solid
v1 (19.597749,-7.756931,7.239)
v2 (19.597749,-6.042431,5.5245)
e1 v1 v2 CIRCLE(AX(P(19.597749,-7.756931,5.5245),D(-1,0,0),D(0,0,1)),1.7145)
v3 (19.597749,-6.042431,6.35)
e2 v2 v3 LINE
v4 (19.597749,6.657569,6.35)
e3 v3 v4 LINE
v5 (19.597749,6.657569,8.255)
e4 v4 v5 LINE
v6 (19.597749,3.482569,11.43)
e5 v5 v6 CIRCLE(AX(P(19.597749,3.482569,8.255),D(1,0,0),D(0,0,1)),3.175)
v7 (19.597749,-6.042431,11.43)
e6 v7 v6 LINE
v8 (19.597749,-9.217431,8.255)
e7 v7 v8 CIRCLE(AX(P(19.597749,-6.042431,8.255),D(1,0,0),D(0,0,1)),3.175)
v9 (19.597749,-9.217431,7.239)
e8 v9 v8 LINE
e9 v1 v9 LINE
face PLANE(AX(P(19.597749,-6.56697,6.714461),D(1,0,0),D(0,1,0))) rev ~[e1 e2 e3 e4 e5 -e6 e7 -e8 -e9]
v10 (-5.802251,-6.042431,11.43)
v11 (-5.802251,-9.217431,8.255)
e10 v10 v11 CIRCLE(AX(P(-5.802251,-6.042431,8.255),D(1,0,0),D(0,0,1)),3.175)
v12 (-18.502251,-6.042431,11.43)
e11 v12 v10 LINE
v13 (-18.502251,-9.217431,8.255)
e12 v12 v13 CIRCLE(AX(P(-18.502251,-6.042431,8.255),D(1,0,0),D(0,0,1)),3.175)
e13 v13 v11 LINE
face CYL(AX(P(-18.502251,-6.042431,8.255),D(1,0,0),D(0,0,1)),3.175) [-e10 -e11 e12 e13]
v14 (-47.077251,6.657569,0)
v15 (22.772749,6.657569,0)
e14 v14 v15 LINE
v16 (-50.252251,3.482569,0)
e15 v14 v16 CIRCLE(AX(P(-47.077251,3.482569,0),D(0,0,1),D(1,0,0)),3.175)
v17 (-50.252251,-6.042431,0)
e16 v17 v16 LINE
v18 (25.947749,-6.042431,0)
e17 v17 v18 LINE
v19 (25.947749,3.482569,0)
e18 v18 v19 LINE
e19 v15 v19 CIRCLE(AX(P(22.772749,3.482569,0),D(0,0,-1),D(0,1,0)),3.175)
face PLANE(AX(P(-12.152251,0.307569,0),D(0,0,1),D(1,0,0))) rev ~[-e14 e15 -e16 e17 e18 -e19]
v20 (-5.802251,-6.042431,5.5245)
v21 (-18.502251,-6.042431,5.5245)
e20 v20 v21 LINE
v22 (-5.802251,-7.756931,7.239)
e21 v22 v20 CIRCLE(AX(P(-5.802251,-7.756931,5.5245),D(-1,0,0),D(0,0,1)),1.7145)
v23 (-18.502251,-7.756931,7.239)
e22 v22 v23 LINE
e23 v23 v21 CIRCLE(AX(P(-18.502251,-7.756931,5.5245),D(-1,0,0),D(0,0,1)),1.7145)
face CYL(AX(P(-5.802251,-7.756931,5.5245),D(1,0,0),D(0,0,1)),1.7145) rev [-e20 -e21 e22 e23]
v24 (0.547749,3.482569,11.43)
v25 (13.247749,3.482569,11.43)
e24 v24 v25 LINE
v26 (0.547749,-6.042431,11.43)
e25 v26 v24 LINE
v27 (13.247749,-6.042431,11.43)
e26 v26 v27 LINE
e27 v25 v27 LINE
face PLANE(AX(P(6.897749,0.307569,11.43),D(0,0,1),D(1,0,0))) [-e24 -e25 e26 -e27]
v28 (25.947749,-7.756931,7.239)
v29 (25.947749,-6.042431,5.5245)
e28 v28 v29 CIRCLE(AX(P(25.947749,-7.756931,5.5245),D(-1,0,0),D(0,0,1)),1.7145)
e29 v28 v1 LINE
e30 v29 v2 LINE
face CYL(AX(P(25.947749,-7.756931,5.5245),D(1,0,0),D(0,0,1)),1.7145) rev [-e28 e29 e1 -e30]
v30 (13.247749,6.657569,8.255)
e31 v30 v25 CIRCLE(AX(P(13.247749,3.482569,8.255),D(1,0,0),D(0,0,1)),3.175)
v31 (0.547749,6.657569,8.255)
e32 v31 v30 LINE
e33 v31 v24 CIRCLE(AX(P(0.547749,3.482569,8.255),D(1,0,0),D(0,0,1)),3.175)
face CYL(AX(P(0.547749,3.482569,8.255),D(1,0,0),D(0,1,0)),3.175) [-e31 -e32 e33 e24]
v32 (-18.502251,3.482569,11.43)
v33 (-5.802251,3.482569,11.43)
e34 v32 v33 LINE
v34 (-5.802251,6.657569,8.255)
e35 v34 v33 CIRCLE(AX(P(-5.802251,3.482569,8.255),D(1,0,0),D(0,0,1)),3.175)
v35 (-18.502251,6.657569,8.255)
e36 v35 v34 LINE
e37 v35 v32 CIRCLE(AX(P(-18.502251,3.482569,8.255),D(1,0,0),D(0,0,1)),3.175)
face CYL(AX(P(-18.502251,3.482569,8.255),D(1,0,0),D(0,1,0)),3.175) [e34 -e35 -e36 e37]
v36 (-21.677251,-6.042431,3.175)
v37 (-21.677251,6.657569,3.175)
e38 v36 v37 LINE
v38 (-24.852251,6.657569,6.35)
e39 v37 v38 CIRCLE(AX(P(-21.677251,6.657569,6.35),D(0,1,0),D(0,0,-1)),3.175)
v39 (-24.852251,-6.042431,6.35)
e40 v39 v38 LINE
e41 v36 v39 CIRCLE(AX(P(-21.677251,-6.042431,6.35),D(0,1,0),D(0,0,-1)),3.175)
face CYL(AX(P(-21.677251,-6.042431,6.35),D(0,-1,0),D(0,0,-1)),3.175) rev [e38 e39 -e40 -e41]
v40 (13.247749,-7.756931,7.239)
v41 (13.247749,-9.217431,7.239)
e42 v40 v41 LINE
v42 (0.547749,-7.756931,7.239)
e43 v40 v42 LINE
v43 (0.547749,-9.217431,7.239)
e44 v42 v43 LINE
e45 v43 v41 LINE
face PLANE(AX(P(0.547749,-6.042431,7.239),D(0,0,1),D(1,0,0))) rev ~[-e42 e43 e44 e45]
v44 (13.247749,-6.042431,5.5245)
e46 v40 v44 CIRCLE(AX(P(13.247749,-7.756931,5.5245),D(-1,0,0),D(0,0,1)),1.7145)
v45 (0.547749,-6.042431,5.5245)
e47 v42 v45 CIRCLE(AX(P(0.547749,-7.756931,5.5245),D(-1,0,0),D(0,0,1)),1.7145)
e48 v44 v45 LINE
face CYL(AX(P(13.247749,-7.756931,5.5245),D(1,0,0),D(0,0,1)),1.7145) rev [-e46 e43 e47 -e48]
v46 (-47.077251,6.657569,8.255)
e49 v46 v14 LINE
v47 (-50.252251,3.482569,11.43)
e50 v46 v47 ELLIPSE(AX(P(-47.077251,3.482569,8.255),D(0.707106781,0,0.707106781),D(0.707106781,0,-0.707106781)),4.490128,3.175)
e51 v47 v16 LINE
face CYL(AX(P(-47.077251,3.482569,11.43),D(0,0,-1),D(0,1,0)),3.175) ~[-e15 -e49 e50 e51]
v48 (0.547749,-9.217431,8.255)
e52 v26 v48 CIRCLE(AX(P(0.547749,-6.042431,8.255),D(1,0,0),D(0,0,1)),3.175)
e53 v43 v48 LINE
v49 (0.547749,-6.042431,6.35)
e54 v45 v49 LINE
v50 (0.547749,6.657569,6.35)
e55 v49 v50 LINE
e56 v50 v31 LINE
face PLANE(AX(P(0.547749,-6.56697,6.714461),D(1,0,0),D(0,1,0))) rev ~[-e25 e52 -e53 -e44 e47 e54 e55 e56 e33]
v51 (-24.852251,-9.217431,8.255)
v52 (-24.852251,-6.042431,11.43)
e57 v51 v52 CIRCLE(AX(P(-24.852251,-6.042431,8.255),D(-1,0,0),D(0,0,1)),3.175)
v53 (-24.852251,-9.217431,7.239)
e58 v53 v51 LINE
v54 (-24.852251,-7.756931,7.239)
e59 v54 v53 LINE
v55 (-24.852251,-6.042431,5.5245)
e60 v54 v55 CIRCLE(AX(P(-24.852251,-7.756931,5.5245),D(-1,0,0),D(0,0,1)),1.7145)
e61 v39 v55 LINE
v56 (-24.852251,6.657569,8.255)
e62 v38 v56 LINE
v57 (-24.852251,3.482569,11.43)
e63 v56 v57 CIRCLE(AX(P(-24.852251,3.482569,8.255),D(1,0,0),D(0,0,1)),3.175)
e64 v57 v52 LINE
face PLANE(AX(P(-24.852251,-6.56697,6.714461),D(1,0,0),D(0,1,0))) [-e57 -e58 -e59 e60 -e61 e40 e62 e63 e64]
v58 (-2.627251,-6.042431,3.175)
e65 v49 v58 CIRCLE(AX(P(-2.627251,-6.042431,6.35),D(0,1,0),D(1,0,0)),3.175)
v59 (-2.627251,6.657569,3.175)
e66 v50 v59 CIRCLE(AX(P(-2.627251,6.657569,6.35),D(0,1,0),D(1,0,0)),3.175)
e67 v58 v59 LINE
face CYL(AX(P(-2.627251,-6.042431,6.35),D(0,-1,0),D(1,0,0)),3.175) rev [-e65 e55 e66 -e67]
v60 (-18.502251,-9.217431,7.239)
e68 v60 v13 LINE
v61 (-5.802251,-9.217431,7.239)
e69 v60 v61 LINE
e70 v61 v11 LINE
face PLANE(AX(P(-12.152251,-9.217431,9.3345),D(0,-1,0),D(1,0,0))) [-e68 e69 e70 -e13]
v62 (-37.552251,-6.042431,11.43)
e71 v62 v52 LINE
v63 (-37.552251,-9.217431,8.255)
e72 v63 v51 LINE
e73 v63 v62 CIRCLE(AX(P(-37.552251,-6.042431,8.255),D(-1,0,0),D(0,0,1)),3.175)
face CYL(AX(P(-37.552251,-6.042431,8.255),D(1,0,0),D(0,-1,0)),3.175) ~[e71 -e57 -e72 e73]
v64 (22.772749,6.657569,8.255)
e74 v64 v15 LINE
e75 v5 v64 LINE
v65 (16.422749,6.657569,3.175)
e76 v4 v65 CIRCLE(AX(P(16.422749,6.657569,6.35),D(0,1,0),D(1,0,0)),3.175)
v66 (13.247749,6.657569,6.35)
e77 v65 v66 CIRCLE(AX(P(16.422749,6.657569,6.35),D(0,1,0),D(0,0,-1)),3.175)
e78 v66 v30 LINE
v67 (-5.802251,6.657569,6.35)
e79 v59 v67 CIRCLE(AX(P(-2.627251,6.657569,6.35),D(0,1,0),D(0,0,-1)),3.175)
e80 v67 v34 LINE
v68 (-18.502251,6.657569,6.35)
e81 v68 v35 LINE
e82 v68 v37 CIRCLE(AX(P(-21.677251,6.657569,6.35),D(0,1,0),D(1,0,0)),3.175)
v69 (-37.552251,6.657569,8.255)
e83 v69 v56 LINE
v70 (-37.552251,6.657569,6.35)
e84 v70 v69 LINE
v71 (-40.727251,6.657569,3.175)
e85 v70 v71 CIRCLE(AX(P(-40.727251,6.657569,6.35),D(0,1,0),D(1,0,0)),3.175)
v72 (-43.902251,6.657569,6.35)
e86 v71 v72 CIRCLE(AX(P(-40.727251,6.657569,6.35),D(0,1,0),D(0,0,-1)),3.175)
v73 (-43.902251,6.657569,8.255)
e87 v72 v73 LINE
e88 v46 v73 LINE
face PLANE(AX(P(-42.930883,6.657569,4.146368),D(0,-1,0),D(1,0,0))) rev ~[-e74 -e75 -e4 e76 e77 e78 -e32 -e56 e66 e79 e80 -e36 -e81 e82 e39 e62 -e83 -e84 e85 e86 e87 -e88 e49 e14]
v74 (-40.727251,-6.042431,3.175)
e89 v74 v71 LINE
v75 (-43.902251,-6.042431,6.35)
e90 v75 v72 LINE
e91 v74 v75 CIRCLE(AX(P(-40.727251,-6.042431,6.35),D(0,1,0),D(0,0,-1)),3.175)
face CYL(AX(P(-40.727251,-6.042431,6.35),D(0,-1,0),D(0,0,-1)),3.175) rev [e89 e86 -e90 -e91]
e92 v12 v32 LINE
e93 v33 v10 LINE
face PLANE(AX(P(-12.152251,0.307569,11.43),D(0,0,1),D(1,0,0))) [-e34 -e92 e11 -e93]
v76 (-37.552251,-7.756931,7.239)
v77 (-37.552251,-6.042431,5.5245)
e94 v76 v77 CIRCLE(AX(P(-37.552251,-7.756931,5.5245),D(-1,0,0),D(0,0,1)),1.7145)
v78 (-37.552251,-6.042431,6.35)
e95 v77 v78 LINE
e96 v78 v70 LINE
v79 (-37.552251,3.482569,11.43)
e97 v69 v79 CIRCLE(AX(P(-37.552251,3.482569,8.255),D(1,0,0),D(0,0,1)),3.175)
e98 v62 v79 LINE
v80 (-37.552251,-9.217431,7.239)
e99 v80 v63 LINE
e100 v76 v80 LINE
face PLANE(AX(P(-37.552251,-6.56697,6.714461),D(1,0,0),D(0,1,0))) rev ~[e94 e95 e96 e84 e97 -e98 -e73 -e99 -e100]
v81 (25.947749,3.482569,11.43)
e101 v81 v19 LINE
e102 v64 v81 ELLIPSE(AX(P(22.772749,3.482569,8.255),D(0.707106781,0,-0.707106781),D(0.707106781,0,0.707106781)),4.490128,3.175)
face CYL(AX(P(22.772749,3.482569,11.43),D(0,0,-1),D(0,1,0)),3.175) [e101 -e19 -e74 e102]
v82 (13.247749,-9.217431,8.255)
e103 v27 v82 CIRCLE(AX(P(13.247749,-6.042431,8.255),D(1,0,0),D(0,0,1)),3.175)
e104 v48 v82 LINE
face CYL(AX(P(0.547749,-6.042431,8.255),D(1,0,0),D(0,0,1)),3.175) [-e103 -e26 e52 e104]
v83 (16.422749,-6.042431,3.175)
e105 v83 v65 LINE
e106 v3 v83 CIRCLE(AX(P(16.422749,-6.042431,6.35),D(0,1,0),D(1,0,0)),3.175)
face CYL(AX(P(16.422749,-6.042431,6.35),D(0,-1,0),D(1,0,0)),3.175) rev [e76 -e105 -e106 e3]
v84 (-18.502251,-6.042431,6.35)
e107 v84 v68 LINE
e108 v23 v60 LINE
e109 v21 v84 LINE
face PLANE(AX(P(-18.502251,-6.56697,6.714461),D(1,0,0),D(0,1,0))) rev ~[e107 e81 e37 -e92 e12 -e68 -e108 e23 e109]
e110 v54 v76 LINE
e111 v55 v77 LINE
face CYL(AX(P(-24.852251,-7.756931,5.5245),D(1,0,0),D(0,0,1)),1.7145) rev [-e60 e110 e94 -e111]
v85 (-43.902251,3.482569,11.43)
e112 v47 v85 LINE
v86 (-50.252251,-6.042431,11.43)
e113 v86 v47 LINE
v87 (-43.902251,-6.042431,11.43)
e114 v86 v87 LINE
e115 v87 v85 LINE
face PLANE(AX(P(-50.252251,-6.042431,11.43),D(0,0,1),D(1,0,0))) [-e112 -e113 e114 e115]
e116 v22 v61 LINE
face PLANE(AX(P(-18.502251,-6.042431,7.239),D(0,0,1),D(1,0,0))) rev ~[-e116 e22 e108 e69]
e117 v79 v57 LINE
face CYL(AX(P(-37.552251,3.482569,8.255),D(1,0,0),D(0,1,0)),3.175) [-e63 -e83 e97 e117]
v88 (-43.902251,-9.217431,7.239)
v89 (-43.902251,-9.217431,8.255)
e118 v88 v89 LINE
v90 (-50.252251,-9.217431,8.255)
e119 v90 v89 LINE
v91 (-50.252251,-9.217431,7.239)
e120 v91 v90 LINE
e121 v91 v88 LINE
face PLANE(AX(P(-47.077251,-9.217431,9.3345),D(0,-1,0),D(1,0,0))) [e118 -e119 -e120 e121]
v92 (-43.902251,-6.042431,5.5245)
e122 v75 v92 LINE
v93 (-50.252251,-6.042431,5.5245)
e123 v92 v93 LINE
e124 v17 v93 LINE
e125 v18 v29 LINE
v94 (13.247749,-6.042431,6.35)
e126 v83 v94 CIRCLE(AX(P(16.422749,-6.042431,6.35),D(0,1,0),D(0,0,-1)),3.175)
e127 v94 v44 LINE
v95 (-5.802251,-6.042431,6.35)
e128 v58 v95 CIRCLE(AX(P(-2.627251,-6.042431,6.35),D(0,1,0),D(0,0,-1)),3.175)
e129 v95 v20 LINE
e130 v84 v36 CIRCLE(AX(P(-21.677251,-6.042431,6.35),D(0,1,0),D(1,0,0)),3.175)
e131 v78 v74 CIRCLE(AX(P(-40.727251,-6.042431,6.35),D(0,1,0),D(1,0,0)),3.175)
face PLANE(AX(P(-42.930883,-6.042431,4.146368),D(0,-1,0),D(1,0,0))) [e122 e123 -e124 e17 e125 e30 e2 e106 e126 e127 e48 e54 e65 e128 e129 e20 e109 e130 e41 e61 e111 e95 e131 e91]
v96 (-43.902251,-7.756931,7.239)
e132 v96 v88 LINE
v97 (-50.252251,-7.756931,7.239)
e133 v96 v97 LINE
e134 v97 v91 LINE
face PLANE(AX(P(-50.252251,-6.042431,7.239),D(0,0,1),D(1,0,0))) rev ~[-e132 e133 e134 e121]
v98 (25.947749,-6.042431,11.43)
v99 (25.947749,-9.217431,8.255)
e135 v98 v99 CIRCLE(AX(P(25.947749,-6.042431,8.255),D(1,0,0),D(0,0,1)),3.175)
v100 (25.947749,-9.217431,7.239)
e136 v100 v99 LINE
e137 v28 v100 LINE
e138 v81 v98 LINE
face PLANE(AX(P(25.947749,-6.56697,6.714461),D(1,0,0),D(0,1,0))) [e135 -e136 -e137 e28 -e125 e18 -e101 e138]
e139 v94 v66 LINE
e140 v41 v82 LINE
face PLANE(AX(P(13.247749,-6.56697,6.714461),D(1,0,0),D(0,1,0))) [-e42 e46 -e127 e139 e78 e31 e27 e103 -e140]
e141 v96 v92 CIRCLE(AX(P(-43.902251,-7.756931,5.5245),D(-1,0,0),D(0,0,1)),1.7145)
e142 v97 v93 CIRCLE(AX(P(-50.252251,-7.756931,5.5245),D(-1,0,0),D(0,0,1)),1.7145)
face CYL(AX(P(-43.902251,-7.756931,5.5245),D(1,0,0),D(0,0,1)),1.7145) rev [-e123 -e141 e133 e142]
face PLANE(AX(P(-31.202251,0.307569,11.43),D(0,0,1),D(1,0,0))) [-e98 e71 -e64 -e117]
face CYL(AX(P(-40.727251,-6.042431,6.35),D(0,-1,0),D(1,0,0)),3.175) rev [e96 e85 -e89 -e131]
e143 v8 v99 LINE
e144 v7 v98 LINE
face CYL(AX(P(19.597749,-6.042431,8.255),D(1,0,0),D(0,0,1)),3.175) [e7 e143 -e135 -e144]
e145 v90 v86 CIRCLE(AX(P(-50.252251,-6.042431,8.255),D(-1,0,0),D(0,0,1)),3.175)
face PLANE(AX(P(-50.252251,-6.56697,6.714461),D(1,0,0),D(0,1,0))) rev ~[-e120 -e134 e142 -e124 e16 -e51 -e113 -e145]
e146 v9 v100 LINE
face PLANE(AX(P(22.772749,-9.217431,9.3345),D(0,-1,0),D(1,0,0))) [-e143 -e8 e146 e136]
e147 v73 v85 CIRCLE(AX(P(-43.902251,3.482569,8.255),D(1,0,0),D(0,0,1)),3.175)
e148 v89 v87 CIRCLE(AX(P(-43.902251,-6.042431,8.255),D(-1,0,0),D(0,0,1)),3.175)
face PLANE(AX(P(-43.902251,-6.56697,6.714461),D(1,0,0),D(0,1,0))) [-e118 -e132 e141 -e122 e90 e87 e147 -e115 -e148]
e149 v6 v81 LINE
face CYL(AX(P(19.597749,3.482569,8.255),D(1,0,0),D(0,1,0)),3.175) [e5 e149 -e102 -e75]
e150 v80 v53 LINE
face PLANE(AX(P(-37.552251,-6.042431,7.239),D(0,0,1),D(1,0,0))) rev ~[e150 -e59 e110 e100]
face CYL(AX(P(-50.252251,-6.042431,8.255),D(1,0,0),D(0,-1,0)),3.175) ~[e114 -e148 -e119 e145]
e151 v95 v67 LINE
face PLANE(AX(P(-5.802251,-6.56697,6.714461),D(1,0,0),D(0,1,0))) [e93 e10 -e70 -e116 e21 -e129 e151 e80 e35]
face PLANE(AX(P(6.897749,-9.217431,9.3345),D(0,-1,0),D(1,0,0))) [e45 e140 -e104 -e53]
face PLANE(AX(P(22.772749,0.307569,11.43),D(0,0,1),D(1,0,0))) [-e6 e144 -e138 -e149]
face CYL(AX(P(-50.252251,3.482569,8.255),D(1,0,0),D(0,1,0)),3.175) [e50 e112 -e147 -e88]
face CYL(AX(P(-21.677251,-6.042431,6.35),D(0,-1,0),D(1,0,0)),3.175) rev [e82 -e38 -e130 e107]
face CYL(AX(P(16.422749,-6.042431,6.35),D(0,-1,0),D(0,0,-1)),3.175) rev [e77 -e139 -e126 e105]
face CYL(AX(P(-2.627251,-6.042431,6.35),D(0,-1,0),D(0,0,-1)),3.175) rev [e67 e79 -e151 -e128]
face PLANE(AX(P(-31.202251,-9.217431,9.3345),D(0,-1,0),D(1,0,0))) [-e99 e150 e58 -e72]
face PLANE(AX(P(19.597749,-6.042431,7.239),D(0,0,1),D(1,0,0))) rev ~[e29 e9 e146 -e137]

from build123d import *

# Parameters (mm, degrees)
F0_W      = 76.2
F0_H      = 12.7
F1_DEPTH  = 3.175
F2_W      = 6.35
F2_H      = 12.7
F2_W_2    = 12.7
F3_DEPTH  = 8.255
F4_W      = 6.35
F4_H      = 4.191
F4_W_2    = 12.7
F5_DEPTH  = 3.175
F7_DEPTH  = 6.35
F9_DEPTH  = 12.7
F11_DEPTH = 12.7
F13_DEPTH = 12.7
F15_DEPTH = 6.35
F17_DEPTH = 12.7
F18_R     = 3.175


with BuildPart() as f1:
    # F0 (on Top) → F1 (new body)
    with BuildSketch(Plane.XY):
        with Locations((-12.1522513986, 0.3075693393)):
            Rectangle(F0_W, F0_H)
    extrude(amount=F1_DEPTH)

    # F2 (on face) → F3 (join)
    with BuildSketch(Plane.XY.offset(3.175)):
        with Locations((-47.0772513986, 0.3075693393)):
            Rectangle(F2_W, F2_H)
        with Locations((-31.2022513986, 0.3075693393)):
            Rectangle(F2_W_2, F2_H)
        with Locations((-12.1522513986, 0.3075693393)):
            Rectangle(F2_W_2, F2_H)
        with Locations((6.8977486014, 0.3075693393)):
            Rectangle(F2_W_2, F2_H)
        with Locations((22.7727486014, 0.3075693393)):
            Rectangle(F2_W, F2_H)
    extrude(amount=F3_DEPTH)

    # F4 (on face) → F5 (join)
    with BuildSketch(Plane.XZ.offset(6.0424306607)):
        with Locations((-47.0772513986, 9.3345)):
            Rectangle(F4_W, F4_H)
        with Locations((-31.2022513986, 9.3345)):
            Rectangle(F4_W_2, F4_H)
        with Locations((-12.1522513986, 9.3345)):
            Rectangle(F4_W_2, F4_H)
        with Locations((6.8977486014, 9.3345)):
            Rectangle(F4_W_2, F4_H)
        with Locations((22.7727486014, 9.3345)):
            Rectangle(F4_W, F4_H)
    extrude(amount=F5_DEPTH)

    # F6 (on face) → F7 (join)
    with BuildSketch(Plane.YZ.offset(25.9477486014)):
        with BuildLine():
            Line((-6.0424306607, 7.239), (-7.7569306607, 7.239))
            ThreePointArc((-7.7569306607, 7.239), (-6.5445960844, 6.7368345763), (-6.0424306607, 5.5245))
            Line((-6.0424306607, 5.5245), (-6.0424306607, 7.239))
        make_face()
    extrude(amount=-F7_DEPTH)

    # F8 (on face) → F9 (join)
    with BuildSketch(Plane.YZ.offset(13.2477486014)):
        with BuildLine():
            Line((-6.0424306607, 7.239), (-7.7569306607, 7.239))
            ThreePointArc((-7.7569306607, 7.239), (-6.5445960844, 6.7368345763), (-6.0424306607, 5.5245))
            Line((-6.0424306607, 5.5245), (-6.0424306607, 7.239))
        make_face()
    extrude(amount=-F9_DEPTH)

    # F10 (on face) → F11 (join)
    with BuildSketch(Plane.YZ.offset(-5.8022513986)):
        with BuildLine():
            Line((-6.0424306607, 7.239), (-7.7569306607, 7.239))
            ThreePointArc((-7.7569306607, 7.239), (-6.5445960844, 6.7368345763), (-6.0424306607, 5.5245))
            Line((-6.0424306607, 5.5245), (-6.0424306607, 7.239))
        make_face()
    extrude(amount=-F11_DEPTH)

    # F12 (on face) → F13 (join)
    with BuildSketch(Plane.YZ.offset(-24.8522513986)):
        with BuildLine():
            Line((-6.0424306607, 7.239), (-7.7569306607, 7.239))
            ThreePointArc((-7.7569306607, 7.239), (-6.5445960844, 6.7368345763), (-6.0424306607, 5.5245))
            Line((-6.0424306607, 5.5245), (-6.0424306607, 7.239))
        make_face()
    extrude(amount=-F13_DEPTH)

    # F14 (on face) → F15 (join)
    with BuildSketch(Plane.YZ.offset(-43.9022513986)):
        with BuildLine():
            Line((-6.0424306607, 7.239), (-7.7569306607, 7.239))
            ThreePointArc((-7.7569306607, 7.239), (-6.5445960844, 6.7368345763), (-6.0424306607, 5.5245))
            Line((-6.0424306607, 5.5245), (-6.0424306607, 7.239))
        make_face()
    extrude(amount=-F15_DEPTH)

    # F16 (on face) → F17 (join)
    with BuildSketch(Plane.XZ.offset(6.0424306607)):
        with BuildLine():
            ThreePointArc((-40.7272513986, 3.175), (-42.9723154288, 4.1049359697), (-43.9022513986, 6.35))
            Line((-43.9022513986, 6.35), (-43.9022513986, 5.5245))
            Line((-43.9022513986, 5.5245), (-43.9022513986, 3.175))
            Line((-43.9022513986, 3.175), (-40.7272513986, 3.175))
        make_face()
        with BuildLine():
            ThreePointArc((-37.5522513986, 6.35), (-38.4821873683, 4.1049359697), (-40.7272513986, 3.175))
            Line((-40.7272513986, 3.175), (-37.5522513986, 3.175))
            Line((-37.5522513986, 3.175), (-37.5522513986, 5.5245))
            Line((-37.5522513986, 5.5245), (-37.5522513986, 6.35))
        make_face()
        with BuildLine():
            Line((-24.8522513986, 6.35), (-24.8522513986, 5.5245))
            Line((-24.8522513986, 5.5245), (-24.8522513986, 3.175))
            Line((-24.8522513986, 3.175), (-21.6772513986, 3.175))
            ThreePointArc((-21.6772513986, 3.175), (-23.9223154288, 4.1049359697), (-24.8522513986, 6.35))
        make_face()
        with BuildLine():
            ThreePointArc((-18.5022513986, 6.35), (-19.4321873683, 4.1049359697), (-21.6772513986, 3.175))
            Line((-21.6772513986, 3.175), (-18.5022513986, 3.175))
            Line((-18.5022513986, 3.175), (-18.5022513986, 5.5245))
            Line((-18.5022513986, 5.5245), (-18.5022513986, 6.35))
        make_face()
        with BuildLine():
            Line((-5.8022513986, 6.35), (-5.8022513986, 5.5245))
            Line((-5.8022513986, 5.5245), (-5.8022513986, 3.175))
            Line((-5.8022513986, 3.175), (-2.6272513986, 3.175))
            ThreePointArc((-2.6272513986, 3.175), (-4.8723154288, 4.1049359697), (-5.8022513986, 6.35))
        make_face()
        with BuildLine():
            Line((0.5477486014, 3.175), (0.5477486014, 5.5245))
            Line((0.5477486014, 5.5245), (0.5477486014, 6.35))
            ThreePointArc((0.5477486014, 6.35), (-0.3821873683, 4.1049359697), (-2.6272513986, 3.175))
            Line((-2.6272513986, 3.175), (0.5477486014, 3.175))
        make_face()
        with BuildLine():
            Line((13.2477486014, 3.175), (16.4227486014, 3.175))
            ThreePointArc((16.4227486014, 3.175), (14.1776845712, 4.1049359697), (13.2477486014, 6.35))
            Line((13.2477486014, 6.35), (13.2477486014, 5.5245))
            Line((13.2477486014, 5.5245), (13.2477486014, 3.175))
        make_face()
        with BuildLine():
            Line((19.5977486014, 3.175), (19.5977486014, 5.5245))
            Line((19.5977486014, 5.5245), (19.5977486014, 6.35))
            ThreePointArc((19.5977486014, 6.35), (18.6678126317, 4.1049359697), (16.4227486014, 3.175))
            Line((16.4227486014, 3.175), (19.5977486014, 3.175))
        make_face()
    extrude(amount=-F17_DEPTH)

    # F18
    f18_edges = [f1.edges().sort_by_distance(p)[0] for p in [
        (22.772749, 6.657569, 11.43),
        (6.897749, 6.657569, 11.43),
        (-12.152251, 6.657569, 11.43),
        (-31.202251, 6.657569, 11.43),
        (-47.077251, 6.657569, 11.43),
        (-47.077251, -9.217431, 11.43),
        (-31.202251, -9.217431, 11.43),
        (-12.152251, -9.217431, 11.43),
        (6.897749, -9.217431, 11.43),
        (22.772749, -9.217431, 11.43),
        (-50.252251, 6.657569, 5.715),
        (25.947749, 6.657569, 5.715),
    ]]
    fillet(f18_edges, radius=F18_R)


solid = f1.part
